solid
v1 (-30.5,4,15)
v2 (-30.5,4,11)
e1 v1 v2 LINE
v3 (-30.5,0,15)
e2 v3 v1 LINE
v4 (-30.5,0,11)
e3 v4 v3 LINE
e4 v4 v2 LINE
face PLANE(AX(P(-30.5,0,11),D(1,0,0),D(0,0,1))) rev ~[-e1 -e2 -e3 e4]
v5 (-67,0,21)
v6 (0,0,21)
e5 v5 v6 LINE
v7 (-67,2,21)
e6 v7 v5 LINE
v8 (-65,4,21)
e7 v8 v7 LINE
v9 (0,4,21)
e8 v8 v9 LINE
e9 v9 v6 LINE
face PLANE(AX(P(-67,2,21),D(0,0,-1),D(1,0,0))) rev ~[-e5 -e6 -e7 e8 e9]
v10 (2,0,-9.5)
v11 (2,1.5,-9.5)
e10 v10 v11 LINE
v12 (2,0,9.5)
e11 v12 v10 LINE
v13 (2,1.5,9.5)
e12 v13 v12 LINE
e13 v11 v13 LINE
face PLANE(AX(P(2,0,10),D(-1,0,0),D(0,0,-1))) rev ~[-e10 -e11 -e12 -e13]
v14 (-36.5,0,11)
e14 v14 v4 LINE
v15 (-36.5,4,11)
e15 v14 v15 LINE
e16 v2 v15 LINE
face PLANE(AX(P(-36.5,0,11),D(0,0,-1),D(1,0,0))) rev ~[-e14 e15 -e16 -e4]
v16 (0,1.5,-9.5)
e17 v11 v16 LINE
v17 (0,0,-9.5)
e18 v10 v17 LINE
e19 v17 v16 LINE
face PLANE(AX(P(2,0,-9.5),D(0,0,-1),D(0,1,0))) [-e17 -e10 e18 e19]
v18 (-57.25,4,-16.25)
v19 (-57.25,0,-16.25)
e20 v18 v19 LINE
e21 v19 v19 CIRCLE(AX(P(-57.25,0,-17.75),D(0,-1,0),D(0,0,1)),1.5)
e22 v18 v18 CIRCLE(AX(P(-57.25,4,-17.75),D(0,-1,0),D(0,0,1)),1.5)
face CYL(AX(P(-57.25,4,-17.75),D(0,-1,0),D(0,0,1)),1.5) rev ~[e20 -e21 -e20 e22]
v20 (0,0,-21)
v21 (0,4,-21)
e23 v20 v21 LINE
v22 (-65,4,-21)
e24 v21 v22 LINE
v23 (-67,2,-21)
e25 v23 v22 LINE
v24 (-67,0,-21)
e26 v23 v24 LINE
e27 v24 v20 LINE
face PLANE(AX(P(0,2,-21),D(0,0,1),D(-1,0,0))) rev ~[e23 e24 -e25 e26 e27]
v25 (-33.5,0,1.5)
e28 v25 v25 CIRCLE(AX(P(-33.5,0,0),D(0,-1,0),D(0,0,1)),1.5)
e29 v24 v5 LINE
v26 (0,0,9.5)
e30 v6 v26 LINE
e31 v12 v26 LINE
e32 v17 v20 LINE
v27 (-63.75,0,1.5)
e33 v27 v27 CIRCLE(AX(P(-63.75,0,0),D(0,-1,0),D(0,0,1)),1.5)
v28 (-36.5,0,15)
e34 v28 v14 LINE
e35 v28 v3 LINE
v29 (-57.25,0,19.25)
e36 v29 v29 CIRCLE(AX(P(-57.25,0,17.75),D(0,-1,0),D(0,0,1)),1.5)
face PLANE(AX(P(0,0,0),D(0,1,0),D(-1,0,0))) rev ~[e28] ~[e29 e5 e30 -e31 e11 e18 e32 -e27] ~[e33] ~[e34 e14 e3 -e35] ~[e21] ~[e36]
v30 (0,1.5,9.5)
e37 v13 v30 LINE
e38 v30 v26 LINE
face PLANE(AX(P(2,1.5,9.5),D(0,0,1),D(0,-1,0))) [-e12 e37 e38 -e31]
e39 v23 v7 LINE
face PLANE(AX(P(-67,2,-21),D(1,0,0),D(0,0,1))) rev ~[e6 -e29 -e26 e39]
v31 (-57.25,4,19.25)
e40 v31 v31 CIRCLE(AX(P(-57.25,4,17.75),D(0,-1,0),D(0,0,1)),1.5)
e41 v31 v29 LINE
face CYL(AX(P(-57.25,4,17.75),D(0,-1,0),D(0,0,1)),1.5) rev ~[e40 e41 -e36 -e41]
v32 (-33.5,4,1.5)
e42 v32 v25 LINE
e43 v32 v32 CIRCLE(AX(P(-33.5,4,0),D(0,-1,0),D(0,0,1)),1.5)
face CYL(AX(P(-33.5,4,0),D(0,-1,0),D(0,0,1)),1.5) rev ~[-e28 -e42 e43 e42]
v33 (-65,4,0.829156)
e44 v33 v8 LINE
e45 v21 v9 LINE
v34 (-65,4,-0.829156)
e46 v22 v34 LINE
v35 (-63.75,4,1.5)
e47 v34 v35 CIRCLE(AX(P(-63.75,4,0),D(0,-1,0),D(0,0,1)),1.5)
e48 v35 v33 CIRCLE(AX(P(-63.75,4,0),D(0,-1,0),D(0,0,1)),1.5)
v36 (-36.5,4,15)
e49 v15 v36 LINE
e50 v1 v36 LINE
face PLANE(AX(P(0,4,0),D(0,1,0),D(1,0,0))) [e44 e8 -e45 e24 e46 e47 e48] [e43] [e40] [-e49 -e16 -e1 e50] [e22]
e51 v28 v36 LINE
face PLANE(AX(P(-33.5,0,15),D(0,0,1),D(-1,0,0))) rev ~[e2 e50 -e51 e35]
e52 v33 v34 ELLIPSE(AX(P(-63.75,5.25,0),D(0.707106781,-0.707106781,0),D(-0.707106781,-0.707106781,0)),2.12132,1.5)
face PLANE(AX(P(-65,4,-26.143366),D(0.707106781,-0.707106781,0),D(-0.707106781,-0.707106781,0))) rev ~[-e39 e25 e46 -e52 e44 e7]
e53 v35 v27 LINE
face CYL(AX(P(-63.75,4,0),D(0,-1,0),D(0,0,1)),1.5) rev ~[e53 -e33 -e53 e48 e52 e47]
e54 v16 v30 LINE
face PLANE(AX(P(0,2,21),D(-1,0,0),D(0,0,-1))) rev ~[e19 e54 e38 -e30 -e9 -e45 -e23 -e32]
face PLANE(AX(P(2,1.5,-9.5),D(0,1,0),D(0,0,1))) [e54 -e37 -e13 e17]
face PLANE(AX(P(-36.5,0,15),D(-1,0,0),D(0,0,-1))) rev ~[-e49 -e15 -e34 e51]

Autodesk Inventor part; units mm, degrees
ref_plane "YZ Plane" through (0, 0, 0) normal (1, 0, 0) x (0, 1, 0)
ref_plane "XZ Plane" through (0, 0, 0) normal (0, 1, 0) x (-1, 0, 0)
ref_plane "XY Plane" through (0, 0, 0) normal (0, 0, 1) x (1, 0, 0)
sketch "Sketch1" plane through (0, 0, 0) normal (0, 1, 0) x (-1, 0, 0)
  arc A0 (67, -23) -> (69, -21) centre (67, -21) ccw
  line L0 (69, -21) -> (69, 21)
  arc A1 (69, 21) -> (67, 23) centre (67, 21) ccw
  line L1 (67, 23) -> (0, 23)
  arc A2 (0, 23) -> (-2, 21) centre (0, 21) ccw
  line L2 (-2, 21) -> (-2, -21)
  arc A3 (-2, -21) -> (0, -23) centre (0, -21) ccw
  line L3 (0, -23) -> (67, -23)
  line L4 (67, -21) -> (0, -21)
  line L5 (0, -21) -> (0, 21)
  line L6 (0, 21) -> (67, 21)
  line L7 (67, 21) -> (67, -21)
  line L8 (67, 21) -> (60.5, 21)
  line L9 (60.5, 21) -> (60.5, 14.5)
  line L10 (60.5, 14.5) -> (67, 14.5)
  line L11 (67, 14.5) -> (67, 21)
  line L12 (67, -21) -> (67, 21)
  line L13 (67, -21) -> (60.5, -21)
  line L14 (60.5, -21) -> (60.5, -14.5)
  line L15 (60.5, -14.5) -> (67, -14.5)
  line L16 (67, -14.5) -> (67, -21)
  line L17 (67, -21) -> (60.5, -14.5)
  line L18 (67, 21) -> (69, 21)
  line L19 (67, 21) -> (60.5, 14.5)
  line L20 (0, 16.25) -> (-2, 16.25)
  circle A4 centre (64.5, -18.5) radius 1
  circle A5 centre (64.5, 18.5) radius 1
  line L21 (60.5, -21) -> (0, -21)
  line L22 (0, -21) -> (0, 21)
  line L23 (0, 21) -> (60.5, 21)
  line L24 (60.5, 21) -> (60.5, 14.5)
  line L25 (60.5, 14.5) -> (67, 14.5)
  line L26 (67, 14.5) -> (67, -14.5)
  line L27 (67, -14.5) -> (60.5, -14.5)
  line L28 (60.5, -14.5) -> (60.5, -21)
  arc A6 (67, -23) -> (69, -21) centre (67, -21) ccw
  line L29 (69, -21) -> (69, 21)
  arc A7 (69, 21) -> (67, 23) centre (67, 21) ccw
  line L30 (67, 23) -> (0, 23)
  arc A8 (0, 23) -> (-2, 21) centre (0, 21) ccw
  line L31 (-2, 21) -> (-2, -21)
  arc A9 (-2, -21) -> (0, -23) centre (0, -21) ccw
  line L32 (0, -23) -> (67, -23)
  line L33 (-2, -10) -> (0, -10)
  line L34 (0, -10) -> (0, 10)
  line L35 (0, 10) -> (-2, 10)
  line L36 (-2, 10) -> (-2, -10)
  line L37 (0, -21) -> (4.5, -21)
  line L38 (67, 21) -> (0, 21)
  line L39 (0, 21) -> (0, -21)
  line L40 (0, -21) -> (67, -21)
  line L41 (67, -21) -> (67, 21)
  line L42 (0, 16.25) -> (-2, 16.25)
  line L43 (67, -21) -> (60.5, -21)
  line L44 (0, -21) -> (0, 21)
  line L45 (0, 21) -> (54, 21)
  line L46 (67, 21) -> (67, 3.25)
  arc A10 (67, -23) -> (69, -21) centre (67, -21) ccw
  line L47 (69, -21) -> (69, 21)
  arc A11 (69, 21) -> (67, 23) centre (67, 21) ccw
  line L48 (67, 23) -> (0, 23)
  arc A12 (0, 23) -> (-2, 21) centre (0, 21) ccw
  line L49 (-2, 21) -> (-2, -21)
  arc A13 (-2, -21) -> (0, -23) centre (0, -21) ccw
  line L50 (0, -23) -> (67, -23)
  line L51 (-2, -10) -> (0, -10)
  line L52 (0, -10) -> (0, 10)
  line L53 (0, 10) -> (-2, 10)
  line L54 (-2, 10) -> (-2, -10)
  line L55 (0, -21) -> (4.5, -21)
  line L56 (67, 21) -> (0, 21)
  line L57 (0, 21) -> (0, -21)
  line L58 (0, -21) -> (67, -21)
  line L59 (67, -21) -> (67, 21)
  line L60 (60.5, -21) -> (60.5, -14.5)
  line L61 (60.5, -14.5) -> (54, -14.5)
  line L62 (54, -14.5) -> (54, -21)
  line L63 (54, -21) -> (0, -21)
  line L64 (54, 21) -> (54, 14.5)
  line L65 (54, 14.5) -> (60.5, 14.5)
  line L66 (60.5, 14.5) -> (60.5, 21)
  line L67 (60.5, 21) -> (67, 21)
  line L68 (67, 3.25) -> (60.5, 3.25)
  line L69 (60.5, 3.25) -> (60.5, -3.25)
  line L70 (60.5, -3.25) -> (67, -3.25)
  line L71 (67, -3.25) -> (67, -21)
  line L72 (67, -3.25) -> (60.5, 3.25)
  line L73 (54, -14.5) -> (60.5, -21)
  line L74 (54, 14.5) -> (60.5, 21)
  point P0 (0, 0)
  point P1 (0, 0)
  point P2 (0, 0)
  point P3 (0, 0)
  point P4 (63.75, 0)
  point P5 (57.25, -17.75)
  point P6 (57.25, 17.75)
  dimension "d0" = 6.5
  dimension "d1" = 6.5
  dimension "d2" = 6.5
  dimension "d3" = 6.5
  dimension "d4" = 10
  dimension "d5" = 10
  dimension "d25" = 10
  dimension "d26" = 10
extrude "Extrusion1" add sketch "Sketch1" along normal blind 2 contours L19 A5 L9 L6 | L7 L10 L19 A5 | L2 L35 L5 L33 | L74 L64 L6 | L9 L65 L74 | L7 L68 L69 L70 L15 L61 L62 L4 L5 L6 L64 L65 L10 | A5 L19 | L19 A5 | L7 L72 L68 | L70 L69 L72 | L7 L17 A4 L15 | L62 L73 L4 | L4 L14 L17 A4 | L14 L73 L61 | A4 L17 | L17 A4
sketch "Sketch2" plane through (0, 2, 0) normal (0, 1, 0) x (1, 0, 0)
  line L0 (0, -10) -> (2, -10) projected
  line L1 (2, -10) -> (2, 10) projected
  line L2 (2, 10) -> (0, 10) projected
  line L3 (0, 10) -> (0, 21) projected
  line L4 (0, 21) -> (-67, 21) projected
  line L5 (-67, 21) -> (-67, -21) projected
  line L6 (-67, -21) -> (0, -21) projected
  line L7 (0, -21) -> (0, -10) projected
  line L8 (-67, -21) -> (0, -21)
  line L9 (0, -21) -> (0, 21)
  line L10 (0, 21) -> (-67, 21)
  line L11 (-67, 21) -> (-67, -21)
  point P0 (0, 0)
extrude "Extrusion2" add sketch "Sketch2" along normal blind 2 contours L7 L6 L5 L4 L3 L9
sketch "Sketch3" plane through (-67, 0, 21) normal (0, 0, 1) x (1, 0, 0)
  point P0 (67, 0)
sketch "Sketch4" plane through (0, 4, 0) normal (0, 1, 0) x (1, 0, 0)
  line L0 (0, 21) -> (-67, 21) projected
  line L1 (-67, 21) -> (-67, -21) projected
  line L2 (-67, -21) -> (0, -21) projected
  line L3 (0, -21) -> (0, 21) projected
  line L4 (0, 10) -> (0, 21) projected
  line L5 (0, 21) -> (-67, -21)
  point P0 (0, 0)
  point P1 (-33.5, 0)
  point P2 (-57.25, 17.75)
  point P3 (-63.75, 0)
  point P4 (-57.25, -17.75)
  point P5 (-57.25, 17.75)
  point P6 (-63.75, 0)
  point P7 (-57.25, -17.75)
hole "Hole1" at (-33.5, 4, 0) at (-57.25, 4, -17.75) at (-57.25, 4, 17.75) at (-63.75, 4, 0) direction (0, -1, 0) diameter 3 depth 8 tip angle 118
sketch "Sketch5" plane through (2, 0, 10) normal (1, 0, 0) x (0, 0, -1)
  line L0 (0, 0) -> (20, 0) projected
  line L1 (20, 0) -> (20, 2) projected
  line L2 (0, 2) -> (20, 2) projected
  line L3 (0, 0) -> (0, 2) projected
  line L4 (20, 2) -> (20, 0)
  line L5 (20, 0) -> (0, 0)
  line L6 (0, 0) -> (0, 2)
  line L7 (0, 2) -> (20, 2)
  line L8 (0, 0) -> (20, 0) projected
  line L9 (0.5, 0) -> (19.5, 0)
  line L10 (19.5, 0) -> (19.5, 1.5)
  line L11 (19.5, 1.5) -> (0.5, 1.5)
  line L12 (0.5, 1.5) -> (0.5, 0)
  point P0 (10, 0)
  dimension "d20" = 0.5
  dimension "d21" = 0.5
  dimension "d22" = 0.5
extrude "Extrusion4" cut sketch "Sketch5" against normal up to surface (2 mm away) contours L3 L2 L1 L0 L10 L11 L12
sketch "Sketch6" plane through (0, 0, 0) normal (0, -1, 0) x (1, 0, 0)
  line L0 (-30.5, 15) -> (-36.5, 15)
  line L1 (-36.5, 15) -> (-36.5, 11)
  line L2 (-36.5, 11) -> (-30.5, 11)
  line L3 (-30.5, 11) -> (-30.5, 15)
  circle A0 centre (-63.75, 0) radius 1.5 projected
  circle A1 centre (-57.25, -17.75) radius 1.5 projected
  circle A2 centre (-33.5, 0) radius 1.5 projected
  circle A3 centre (-57.25, 17.75) radius 1.5 projected
  line L4 (2, 9.5) -> (0, 9.5) projected
  line L5 (0, 21) -> (0, 9.5) projected
  line L6 (-67, 21) -> (0, 21) projected
  line L7 (-67, -21) -> (-67, 21) projected
  line L8 (0, -21) -> (-67, -21) projected
  line L9 (0, -21) -> (0, -9.5) projected
  line L10 (0, -9.5) -> (2, -9.5) projected
  line L11 (2, 9.5) -> (2, -9.5) projected
  line L12 (-33.5, 21) -> (-33.5, 15)
  point P0 (0, 0)
  dimension "d27" = 4
  dimension "d28" = 6
  dimension "d29" = 6
extrude "Extrusion5" cut sketch "Sketch6" against normal through all contours L3 L2 L1 L0
chamfer "Chamfer1" distance 2 angle 45 1 edges at (-67, 4, 0)
properties part number "ttgorear"
